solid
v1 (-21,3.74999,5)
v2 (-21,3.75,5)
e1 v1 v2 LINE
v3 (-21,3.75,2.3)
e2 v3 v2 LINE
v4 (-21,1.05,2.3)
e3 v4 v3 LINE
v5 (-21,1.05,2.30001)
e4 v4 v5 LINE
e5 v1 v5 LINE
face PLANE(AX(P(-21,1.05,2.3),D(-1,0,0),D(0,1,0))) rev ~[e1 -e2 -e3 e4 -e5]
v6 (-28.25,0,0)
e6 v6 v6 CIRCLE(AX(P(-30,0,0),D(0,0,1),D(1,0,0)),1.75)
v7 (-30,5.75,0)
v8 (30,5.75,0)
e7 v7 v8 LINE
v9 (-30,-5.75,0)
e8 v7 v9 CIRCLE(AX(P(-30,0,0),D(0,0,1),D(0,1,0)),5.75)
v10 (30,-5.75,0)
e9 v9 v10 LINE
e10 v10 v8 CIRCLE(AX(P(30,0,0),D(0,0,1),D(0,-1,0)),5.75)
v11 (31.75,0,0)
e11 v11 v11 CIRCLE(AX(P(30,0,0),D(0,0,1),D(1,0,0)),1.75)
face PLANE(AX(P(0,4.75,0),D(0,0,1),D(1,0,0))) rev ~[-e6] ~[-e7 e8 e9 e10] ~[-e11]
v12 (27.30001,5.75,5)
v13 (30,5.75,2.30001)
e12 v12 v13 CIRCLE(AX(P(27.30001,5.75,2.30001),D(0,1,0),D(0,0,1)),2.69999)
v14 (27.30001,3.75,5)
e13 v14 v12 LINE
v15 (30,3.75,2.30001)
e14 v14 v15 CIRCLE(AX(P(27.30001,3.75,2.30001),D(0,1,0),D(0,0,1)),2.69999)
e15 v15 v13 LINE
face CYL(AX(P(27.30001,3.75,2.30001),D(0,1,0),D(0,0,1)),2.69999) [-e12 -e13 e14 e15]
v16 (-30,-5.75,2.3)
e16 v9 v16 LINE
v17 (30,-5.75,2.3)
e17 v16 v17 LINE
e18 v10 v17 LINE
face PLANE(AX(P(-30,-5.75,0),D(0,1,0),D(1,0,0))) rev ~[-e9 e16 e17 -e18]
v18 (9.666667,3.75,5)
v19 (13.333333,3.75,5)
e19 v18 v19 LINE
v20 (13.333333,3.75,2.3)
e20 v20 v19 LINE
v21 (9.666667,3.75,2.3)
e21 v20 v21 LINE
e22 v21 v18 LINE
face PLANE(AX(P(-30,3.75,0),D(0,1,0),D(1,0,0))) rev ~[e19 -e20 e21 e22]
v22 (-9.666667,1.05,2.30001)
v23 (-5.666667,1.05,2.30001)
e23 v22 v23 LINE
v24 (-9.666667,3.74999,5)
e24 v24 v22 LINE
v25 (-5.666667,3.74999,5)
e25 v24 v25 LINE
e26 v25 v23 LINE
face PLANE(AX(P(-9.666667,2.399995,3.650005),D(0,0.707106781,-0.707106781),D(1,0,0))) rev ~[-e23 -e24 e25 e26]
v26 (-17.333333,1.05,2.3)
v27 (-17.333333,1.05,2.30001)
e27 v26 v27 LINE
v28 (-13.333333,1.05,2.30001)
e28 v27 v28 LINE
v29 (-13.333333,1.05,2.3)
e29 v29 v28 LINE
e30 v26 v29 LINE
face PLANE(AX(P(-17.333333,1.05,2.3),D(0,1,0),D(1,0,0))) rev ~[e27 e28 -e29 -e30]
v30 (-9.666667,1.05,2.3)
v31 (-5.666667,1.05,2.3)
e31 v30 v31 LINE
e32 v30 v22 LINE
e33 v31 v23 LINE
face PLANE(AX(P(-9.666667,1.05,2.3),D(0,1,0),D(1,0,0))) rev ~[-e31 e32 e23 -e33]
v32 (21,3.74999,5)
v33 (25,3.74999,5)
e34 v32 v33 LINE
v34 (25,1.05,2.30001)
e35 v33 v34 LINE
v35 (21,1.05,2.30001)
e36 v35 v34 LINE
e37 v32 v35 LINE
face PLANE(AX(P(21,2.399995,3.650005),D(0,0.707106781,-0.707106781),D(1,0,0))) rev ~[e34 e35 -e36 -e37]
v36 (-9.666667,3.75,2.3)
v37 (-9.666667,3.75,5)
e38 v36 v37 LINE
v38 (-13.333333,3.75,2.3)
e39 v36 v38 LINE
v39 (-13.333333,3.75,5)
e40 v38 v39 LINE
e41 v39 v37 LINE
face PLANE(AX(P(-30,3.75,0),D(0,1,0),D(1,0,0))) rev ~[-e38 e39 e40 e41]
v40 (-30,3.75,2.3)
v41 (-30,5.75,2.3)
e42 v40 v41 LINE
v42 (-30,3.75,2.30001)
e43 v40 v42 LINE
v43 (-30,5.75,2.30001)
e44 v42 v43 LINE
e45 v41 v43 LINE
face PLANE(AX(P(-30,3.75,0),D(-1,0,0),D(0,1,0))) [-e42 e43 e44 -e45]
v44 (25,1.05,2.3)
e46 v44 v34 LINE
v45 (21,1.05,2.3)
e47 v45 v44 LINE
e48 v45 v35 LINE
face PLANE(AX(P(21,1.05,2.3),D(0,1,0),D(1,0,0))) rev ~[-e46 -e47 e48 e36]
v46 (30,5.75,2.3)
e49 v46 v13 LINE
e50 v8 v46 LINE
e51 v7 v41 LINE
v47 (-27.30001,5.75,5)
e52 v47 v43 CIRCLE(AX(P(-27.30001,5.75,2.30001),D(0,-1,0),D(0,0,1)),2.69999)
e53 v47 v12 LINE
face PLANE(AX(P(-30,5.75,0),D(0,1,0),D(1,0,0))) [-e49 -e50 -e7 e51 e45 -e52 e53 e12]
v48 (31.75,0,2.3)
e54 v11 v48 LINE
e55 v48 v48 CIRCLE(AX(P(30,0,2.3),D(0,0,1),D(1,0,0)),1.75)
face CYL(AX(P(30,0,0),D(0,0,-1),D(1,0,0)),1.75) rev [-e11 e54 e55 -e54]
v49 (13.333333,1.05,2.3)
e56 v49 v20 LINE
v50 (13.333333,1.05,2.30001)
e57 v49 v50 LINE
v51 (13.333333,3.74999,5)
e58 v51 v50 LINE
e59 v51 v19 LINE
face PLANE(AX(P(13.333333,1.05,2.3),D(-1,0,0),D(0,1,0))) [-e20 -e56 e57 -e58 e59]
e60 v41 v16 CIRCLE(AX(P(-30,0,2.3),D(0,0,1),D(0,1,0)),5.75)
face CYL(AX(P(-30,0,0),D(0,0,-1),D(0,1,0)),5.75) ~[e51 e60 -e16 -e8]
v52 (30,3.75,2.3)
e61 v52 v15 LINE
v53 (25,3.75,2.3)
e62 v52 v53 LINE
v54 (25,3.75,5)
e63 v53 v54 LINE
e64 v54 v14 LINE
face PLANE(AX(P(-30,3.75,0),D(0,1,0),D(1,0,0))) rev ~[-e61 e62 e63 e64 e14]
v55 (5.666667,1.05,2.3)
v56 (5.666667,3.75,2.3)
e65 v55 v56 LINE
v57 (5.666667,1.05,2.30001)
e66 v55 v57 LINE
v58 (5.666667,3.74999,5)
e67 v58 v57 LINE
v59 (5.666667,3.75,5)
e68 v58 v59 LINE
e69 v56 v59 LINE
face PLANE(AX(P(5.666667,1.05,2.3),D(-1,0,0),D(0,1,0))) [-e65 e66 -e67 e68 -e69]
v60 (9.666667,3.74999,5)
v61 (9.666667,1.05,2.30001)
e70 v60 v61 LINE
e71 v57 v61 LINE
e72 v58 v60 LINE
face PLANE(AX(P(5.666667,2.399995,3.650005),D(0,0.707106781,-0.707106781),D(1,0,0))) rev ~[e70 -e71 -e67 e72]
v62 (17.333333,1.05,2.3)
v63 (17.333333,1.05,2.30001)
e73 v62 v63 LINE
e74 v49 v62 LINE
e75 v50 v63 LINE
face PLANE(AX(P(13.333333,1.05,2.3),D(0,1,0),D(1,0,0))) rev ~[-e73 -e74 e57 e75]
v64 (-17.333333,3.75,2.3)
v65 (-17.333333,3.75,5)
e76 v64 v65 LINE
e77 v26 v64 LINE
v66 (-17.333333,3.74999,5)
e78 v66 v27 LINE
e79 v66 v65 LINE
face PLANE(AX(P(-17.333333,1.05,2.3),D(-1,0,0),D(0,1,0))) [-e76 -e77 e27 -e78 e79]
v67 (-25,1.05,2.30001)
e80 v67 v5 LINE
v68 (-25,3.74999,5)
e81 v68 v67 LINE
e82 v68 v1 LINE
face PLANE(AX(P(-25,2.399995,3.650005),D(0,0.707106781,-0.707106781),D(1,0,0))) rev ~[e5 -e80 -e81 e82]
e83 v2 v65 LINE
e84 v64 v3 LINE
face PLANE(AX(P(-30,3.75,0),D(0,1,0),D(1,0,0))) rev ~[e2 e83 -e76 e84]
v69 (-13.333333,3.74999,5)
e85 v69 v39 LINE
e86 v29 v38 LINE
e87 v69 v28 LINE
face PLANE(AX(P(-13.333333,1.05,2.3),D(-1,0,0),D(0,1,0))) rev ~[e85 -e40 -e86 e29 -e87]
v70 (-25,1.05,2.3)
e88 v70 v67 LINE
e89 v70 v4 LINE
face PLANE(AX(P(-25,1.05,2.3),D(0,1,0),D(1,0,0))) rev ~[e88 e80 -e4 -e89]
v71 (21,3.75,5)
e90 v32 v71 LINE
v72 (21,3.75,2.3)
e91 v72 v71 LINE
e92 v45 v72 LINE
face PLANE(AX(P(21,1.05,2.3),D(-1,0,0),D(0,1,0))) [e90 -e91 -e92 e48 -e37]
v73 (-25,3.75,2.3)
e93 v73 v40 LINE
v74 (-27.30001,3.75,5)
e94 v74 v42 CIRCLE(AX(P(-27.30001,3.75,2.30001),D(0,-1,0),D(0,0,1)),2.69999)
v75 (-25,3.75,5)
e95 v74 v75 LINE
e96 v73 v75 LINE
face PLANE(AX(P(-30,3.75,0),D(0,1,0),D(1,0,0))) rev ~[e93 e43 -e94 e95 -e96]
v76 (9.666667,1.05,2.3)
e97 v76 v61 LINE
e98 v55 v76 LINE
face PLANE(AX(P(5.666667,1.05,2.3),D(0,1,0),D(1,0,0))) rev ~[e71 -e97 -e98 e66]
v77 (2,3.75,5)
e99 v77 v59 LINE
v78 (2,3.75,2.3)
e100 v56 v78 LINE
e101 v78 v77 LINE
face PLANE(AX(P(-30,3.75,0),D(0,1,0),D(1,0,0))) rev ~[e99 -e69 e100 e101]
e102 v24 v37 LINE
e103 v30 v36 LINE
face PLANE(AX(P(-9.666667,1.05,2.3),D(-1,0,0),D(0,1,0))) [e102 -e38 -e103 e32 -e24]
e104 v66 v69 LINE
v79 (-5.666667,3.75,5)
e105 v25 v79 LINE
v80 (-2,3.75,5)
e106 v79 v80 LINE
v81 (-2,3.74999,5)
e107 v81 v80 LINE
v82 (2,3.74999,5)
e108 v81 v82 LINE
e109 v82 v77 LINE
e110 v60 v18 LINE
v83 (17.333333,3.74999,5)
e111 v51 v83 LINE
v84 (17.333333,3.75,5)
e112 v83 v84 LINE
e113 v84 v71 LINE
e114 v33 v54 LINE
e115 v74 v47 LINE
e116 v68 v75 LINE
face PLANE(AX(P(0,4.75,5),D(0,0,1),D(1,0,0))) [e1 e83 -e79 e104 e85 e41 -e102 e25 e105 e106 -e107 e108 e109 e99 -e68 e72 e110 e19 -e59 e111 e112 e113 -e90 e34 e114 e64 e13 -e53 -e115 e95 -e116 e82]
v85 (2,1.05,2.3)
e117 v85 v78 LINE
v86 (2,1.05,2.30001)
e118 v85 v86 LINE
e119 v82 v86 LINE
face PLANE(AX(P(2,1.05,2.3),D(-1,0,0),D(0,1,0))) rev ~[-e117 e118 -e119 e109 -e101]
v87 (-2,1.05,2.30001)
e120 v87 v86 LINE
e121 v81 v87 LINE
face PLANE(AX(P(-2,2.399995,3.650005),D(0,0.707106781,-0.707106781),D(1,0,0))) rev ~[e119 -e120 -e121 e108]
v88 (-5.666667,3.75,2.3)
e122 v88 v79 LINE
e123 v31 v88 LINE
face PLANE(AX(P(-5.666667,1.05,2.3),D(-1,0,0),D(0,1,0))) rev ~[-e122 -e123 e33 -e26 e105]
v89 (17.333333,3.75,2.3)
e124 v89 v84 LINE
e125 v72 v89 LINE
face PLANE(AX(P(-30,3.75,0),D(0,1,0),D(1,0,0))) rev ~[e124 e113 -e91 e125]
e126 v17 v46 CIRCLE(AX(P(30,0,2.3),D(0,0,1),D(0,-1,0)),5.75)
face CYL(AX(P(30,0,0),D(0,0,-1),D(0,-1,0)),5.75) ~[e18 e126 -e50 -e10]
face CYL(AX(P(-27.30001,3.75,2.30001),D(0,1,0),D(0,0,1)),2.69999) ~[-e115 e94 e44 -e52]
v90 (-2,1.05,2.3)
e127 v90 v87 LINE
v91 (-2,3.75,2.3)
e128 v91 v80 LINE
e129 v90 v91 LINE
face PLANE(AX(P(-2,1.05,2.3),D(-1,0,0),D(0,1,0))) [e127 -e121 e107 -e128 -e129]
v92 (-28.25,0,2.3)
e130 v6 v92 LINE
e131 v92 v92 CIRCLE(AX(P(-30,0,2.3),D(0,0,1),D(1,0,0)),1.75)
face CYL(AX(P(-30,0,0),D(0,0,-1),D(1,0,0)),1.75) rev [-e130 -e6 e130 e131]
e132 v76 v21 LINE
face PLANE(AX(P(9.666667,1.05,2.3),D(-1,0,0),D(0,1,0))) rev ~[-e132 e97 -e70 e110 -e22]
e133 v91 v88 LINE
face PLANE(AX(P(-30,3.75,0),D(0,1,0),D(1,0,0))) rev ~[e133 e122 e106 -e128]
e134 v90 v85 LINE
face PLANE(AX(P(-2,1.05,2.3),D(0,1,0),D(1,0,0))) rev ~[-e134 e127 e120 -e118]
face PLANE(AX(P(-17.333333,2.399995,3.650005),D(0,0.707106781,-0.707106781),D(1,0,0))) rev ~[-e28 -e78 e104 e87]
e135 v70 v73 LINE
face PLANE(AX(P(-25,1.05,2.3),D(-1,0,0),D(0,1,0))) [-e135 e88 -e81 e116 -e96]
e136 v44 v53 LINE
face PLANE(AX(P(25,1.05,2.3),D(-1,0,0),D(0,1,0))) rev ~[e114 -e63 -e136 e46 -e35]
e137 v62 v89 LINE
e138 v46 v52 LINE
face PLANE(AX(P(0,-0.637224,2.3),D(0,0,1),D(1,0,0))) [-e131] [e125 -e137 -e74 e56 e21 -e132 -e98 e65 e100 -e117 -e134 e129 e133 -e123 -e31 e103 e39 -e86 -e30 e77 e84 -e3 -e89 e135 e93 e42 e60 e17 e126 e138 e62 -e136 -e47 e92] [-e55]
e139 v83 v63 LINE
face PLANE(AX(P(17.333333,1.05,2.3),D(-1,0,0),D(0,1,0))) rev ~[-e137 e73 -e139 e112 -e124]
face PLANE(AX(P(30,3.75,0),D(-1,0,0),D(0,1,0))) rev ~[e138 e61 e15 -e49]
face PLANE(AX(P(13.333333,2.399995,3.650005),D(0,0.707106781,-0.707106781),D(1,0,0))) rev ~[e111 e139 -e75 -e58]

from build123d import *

# Parameters (mm, degrees)
F0_R     = 1.75
F1_DEPTH = 2.3
F0_W     = 60
F0_H     = 2
F2_DEPTH = 5
F3_W     = 4
F3_H     = 2.7
F4_DEPTH = 2.7
F5_SIZE  = 2.69999
F6_R     = 2.69999


# Not quite as in the source:
# - a fillet or chamfer is up to 0.001 mm smaller than in the source, because OpenCascade refuses the exact size


with BuildPart() as f1:
    # F0 (on Top) → F1 (new body)
    with BuildSketch(Plane.XY):
        with BuildLine():
            Line((-30, 3.75), (-30, 5.75))
            ThreePointArc((-30, 5.75), (-35.75, 0), (-30, -5.75))
            Line((-30, -5.75), (30, -5.75))
            ThreePointArc((30, -5.75), (35.75, 0), (30, 5.75))
            Line((30, 5.75), (30, 3.75))
            Line((30, 3.75), (-30, 3.75))
        make_face()
        with Locations((-30, 0)):
            Circle(F0_R, mode=Mode.SUBTRACT)
        with Locations((30, 0)):
            Circle(F0_R, mode=Mode.SUBTRACT)
    extrude(amount=F1_DEPTH)

    # F0 (on Top) → F2 (join)
    with BuildSketch(Plane.XY):
        with Locations((0, 4.75)):
            Rectangle(F0_W, F0_H)
    extrude(amount=F2_DEPTH)

    # F3 (on face) → F4 (join, through all)
    with BuildSketch(Plane.XY.offset(2.3)):
        with Locations((-23, 2.4)):
            Rectangle(F3_W, F3_H)
        with Locations((-15.3333333333, 2.4)):
            Rectangle(F3_W, F3_H)
        with Locations((-7.6666666667, 2.4)):
            Rectangle(F3_W, F3_H)
        with Locations((0, 2.4)):
            Rectangle(F3_W, F3_H)
        with Locations((7.6666666667, 2.4)):
            Rectangle(F3_W, F3_H)
        with Locations((15.3333333333, 2.4)):
            Rectangle(F3_W, F3_H)
        with Locations((23, 2.4)):
            Rectangle(F3_W, F3_H)
    extrude(amount=F4_DEPTH)

    # F5 (size 2.7 in the source; OpenCascade refuses exactly that, so slightly less here)
    f5_edges = [f1.edges().sort_by_distance(p)[0] for p in [
        (-23, 1.05, 5),
        (-15.333333, 1.05, 5),
        (-7.666667, 1.05, 5),
        (0, 1.05, 5),
        (7.666667, 1.05, 5),
        (15.333333, 1.05, 5),
        (23, 1.05, 5),
    ]]
    chamfer(f5_edges, length=F5_SIZE)

    # F6 (radius 2.7 in the source; OpenCascade refuses exactly that, so slightly less here)
    f6_edges = [f1.edges().sort_by_distance(p)[0] for p in [
        (30, 4.75, 5),
        (-30, 4.75, 5),
    ]]
    fillet(f6_edges, radius=F6_R)


solid = f1.part
